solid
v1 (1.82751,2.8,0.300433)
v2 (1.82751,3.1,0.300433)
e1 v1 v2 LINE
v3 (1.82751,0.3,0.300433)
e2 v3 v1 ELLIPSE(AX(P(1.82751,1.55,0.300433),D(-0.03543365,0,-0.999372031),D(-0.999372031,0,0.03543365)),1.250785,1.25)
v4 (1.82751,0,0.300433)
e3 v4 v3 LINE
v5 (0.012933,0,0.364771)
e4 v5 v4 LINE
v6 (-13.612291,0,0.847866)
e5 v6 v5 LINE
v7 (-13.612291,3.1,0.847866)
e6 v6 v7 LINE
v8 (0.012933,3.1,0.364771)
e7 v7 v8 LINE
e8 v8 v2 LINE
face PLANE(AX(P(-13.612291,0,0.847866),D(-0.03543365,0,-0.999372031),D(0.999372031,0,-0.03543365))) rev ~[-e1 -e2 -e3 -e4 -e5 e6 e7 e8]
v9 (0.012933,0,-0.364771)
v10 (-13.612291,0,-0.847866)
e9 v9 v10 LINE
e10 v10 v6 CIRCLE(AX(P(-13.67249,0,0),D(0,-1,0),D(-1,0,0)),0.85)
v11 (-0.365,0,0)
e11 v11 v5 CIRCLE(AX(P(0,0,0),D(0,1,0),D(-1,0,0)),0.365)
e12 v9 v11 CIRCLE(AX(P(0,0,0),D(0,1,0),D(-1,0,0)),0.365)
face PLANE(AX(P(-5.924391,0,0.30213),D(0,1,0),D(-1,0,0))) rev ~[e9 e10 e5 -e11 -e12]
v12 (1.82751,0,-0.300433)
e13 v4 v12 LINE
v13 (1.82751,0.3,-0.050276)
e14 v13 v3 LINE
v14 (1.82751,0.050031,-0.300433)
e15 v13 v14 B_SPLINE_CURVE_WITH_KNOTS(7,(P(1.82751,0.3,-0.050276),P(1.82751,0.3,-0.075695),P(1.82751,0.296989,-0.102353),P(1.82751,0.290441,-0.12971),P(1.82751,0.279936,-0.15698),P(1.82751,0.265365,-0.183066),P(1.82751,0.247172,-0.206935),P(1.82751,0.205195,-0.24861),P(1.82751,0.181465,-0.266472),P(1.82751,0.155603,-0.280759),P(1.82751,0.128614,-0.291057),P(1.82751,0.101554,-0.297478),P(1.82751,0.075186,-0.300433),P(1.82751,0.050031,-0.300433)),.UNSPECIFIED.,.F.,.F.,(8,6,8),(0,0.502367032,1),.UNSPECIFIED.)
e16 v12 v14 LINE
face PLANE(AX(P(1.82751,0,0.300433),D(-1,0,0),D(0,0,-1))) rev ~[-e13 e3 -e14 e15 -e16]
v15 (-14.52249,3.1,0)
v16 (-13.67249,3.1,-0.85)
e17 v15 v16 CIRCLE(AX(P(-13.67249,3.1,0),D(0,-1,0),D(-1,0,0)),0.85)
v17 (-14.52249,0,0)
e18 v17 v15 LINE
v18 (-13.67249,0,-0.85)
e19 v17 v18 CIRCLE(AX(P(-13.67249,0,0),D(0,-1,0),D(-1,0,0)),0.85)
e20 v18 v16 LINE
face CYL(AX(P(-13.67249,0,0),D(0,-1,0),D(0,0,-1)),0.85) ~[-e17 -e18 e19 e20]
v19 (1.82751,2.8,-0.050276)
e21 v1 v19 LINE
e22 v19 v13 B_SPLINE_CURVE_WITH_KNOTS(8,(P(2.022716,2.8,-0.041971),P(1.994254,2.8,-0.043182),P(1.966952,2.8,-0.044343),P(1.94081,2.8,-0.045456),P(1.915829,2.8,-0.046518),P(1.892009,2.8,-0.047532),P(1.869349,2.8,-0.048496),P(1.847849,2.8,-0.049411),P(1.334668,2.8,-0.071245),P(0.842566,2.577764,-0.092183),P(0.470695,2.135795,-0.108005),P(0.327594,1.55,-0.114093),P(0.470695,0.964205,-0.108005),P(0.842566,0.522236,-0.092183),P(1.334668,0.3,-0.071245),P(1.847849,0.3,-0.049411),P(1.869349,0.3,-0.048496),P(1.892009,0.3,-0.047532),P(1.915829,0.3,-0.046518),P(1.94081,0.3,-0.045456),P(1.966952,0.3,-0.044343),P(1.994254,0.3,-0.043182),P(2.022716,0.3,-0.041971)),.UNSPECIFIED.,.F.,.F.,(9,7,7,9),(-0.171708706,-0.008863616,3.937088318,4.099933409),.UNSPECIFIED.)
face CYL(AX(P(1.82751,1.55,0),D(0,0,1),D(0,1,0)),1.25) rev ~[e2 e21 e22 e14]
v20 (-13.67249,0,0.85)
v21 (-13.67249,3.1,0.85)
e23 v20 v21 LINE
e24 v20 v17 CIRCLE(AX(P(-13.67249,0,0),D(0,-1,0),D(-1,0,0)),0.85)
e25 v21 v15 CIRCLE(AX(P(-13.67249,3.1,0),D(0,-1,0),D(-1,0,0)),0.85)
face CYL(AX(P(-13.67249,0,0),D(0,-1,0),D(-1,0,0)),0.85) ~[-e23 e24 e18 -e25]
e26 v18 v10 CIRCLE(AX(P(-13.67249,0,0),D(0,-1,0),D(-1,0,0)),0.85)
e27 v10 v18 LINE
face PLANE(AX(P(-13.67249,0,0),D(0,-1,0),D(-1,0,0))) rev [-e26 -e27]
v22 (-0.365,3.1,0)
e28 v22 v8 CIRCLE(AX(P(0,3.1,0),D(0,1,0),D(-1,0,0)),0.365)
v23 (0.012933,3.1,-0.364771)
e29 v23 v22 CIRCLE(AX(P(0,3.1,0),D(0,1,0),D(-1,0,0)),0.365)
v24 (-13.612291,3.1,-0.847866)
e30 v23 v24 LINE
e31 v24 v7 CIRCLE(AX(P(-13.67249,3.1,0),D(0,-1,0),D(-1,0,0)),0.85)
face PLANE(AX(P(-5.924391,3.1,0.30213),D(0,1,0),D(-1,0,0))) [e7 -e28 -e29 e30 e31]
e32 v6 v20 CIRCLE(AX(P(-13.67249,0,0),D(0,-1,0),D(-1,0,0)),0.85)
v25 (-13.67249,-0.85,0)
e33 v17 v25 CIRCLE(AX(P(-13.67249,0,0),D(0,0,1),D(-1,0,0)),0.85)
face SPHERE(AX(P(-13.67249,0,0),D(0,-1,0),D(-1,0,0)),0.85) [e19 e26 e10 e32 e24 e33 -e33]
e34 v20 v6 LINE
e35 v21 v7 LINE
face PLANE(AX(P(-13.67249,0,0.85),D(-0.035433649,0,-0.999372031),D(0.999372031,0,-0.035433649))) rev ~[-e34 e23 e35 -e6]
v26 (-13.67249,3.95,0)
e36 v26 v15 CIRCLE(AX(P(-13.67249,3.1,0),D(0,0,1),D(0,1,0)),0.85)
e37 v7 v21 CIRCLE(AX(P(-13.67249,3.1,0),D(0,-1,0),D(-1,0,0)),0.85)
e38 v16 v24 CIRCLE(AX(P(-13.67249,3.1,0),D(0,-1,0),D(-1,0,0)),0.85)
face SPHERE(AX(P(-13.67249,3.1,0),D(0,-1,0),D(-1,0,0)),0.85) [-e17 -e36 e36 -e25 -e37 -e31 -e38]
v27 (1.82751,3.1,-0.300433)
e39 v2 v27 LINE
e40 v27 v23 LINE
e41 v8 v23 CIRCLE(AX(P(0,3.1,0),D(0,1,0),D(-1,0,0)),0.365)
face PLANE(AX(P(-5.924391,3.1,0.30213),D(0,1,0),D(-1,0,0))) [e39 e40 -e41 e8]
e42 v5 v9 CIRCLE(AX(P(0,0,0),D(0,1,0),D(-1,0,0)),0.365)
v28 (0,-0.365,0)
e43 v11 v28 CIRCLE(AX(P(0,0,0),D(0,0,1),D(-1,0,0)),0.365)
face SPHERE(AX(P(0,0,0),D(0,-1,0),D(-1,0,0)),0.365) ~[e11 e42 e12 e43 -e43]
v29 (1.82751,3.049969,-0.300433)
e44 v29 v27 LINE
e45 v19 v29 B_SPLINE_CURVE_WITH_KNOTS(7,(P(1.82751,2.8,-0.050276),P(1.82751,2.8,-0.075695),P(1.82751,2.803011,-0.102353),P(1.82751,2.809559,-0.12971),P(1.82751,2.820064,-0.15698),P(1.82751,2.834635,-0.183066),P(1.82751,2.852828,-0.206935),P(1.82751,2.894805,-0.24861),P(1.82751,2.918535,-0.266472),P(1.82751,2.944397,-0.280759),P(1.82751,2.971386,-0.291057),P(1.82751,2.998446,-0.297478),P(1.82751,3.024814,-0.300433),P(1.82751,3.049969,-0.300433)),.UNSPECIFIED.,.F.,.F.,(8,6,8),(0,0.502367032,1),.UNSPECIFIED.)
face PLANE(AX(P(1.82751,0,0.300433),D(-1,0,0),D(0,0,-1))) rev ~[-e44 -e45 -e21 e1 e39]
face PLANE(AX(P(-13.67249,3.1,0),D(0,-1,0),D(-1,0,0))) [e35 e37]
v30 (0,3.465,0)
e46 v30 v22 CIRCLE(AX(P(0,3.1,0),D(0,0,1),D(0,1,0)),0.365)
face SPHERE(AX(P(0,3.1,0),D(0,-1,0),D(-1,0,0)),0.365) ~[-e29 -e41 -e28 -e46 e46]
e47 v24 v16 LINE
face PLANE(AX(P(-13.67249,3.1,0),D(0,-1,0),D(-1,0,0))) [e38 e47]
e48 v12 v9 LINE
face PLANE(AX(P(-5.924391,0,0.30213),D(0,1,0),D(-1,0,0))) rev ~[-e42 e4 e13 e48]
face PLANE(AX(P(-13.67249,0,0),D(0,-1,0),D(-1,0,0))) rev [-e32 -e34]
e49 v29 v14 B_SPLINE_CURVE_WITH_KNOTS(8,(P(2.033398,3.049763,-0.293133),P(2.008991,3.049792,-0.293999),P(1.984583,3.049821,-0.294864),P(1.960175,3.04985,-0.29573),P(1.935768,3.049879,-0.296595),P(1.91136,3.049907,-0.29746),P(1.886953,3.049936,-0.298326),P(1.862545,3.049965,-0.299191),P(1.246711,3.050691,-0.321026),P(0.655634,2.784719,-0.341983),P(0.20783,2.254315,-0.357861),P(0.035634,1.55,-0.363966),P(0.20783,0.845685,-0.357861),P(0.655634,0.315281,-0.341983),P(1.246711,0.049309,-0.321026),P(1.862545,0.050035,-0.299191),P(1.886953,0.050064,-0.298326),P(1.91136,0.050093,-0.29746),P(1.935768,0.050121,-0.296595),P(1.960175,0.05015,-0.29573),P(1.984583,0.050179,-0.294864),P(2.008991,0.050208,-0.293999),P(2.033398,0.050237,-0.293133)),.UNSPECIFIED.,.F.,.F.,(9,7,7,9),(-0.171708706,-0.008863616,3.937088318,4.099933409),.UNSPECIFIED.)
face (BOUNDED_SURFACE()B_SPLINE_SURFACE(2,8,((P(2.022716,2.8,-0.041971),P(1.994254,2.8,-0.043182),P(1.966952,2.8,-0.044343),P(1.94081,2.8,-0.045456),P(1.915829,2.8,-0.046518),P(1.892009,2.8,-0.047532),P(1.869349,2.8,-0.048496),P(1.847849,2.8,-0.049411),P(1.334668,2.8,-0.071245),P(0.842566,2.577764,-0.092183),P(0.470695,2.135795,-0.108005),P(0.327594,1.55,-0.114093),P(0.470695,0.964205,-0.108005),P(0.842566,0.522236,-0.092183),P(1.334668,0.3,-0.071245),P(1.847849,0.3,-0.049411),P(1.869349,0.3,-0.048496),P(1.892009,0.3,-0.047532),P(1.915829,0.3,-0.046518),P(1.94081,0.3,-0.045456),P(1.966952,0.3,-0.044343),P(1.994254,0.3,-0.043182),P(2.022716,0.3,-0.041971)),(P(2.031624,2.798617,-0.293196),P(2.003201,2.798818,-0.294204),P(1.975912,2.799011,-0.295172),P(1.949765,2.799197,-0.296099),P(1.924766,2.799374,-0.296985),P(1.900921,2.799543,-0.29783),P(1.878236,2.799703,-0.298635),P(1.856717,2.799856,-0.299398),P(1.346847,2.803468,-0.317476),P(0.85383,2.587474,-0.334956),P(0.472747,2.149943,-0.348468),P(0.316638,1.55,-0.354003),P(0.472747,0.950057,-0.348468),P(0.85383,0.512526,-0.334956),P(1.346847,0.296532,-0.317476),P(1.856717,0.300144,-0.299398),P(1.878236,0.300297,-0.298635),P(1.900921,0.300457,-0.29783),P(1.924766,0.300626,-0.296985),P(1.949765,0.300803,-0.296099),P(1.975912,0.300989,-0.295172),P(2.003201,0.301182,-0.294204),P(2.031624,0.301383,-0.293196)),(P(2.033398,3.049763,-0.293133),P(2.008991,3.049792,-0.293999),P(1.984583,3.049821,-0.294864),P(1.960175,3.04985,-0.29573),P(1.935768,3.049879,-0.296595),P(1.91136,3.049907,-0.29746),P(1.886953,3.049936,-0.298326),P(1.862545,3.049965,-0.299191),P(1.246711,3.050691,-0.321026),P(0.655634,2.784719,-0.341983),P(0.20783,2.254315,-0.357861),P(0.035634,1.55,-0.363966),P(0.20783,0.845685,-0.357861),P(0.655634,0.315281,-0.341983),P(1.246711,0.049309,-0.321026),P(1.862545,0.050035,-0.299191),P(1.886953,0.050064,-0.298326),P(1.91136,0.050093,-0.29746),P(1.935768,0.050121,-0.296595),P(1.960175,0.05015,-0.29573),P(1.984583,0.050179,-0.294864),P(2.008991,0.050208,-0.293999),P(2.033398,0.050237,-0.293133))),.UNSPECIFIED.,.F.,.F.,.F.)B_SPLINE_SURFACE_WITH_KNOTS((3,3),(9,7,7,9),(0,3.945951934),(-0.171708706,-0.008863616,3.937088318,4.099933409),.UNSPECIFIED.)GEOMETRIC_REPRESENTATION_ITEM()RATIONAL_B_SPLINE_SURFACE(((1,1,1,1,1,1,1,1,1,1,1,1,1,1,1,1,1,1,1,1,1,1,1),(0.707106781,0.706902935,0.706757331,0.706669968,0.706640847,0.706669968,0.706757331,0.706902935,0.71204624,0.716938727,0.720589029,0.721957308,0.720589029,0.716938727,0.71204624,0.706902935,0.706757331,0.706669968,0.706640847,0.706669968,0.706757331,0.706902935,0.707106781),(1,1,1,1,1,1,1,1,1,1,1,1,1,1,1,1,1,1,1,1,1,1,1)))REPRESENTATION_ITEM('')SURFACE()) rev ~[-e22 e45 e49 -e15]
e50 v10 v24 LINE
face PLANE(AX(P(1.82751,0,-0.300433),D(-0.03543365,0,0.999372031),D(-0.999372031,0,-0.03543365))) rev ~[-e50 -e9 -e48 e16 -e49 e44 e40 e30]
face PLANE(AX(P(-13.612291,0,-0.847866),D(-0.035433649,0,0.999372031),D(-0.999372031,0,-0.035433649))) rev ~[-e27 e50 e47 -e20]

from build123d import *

# Parameters (mm, degrees)
F4_DEPTH = 3.1
F5_DEPTH = 0.5
F6_R     = 0.25


# Not quite as in the source:
# - a feature names something its author has since deleted; it is built from what else it names


with BuildPart() as f1:
    # F0 (on Top) → F1 (revolve)
    with BuildSketch(Plane.XY):
        with BuildLine():
            Line((-14.52249, 3.1), (-13.67249, 3.1))
            Line((-13.67249, 3.1), (-13.67249, 3.95))
            ThreePointArc((-13.67249, 3.95), (-14.273530764, 3.701040764), (-14.52249, 3.1))
        make_face()
    revolve(axis=Axis((-13.67249, 1.55, 0), (0, -1, 0)))



with BuildPart() as f1b:
    # F0 (on Top) → F1, piece 2 (revolve)
    with BuildSketch(Plane.XY):
        with BuildLine():
            Line((-13.67249, -0.85), (-13.67249, 0))
            Line((-13.67249, 0), (-14.52249, 0))
            ThreePointArc((-14.52249, 0), (-14.273530764, -0.601040764), (-13.67249, -0.85))
        make_face()
    revolve(axis=Axis((-13.67249, 1.55, 0), (0, -1, 0)))


with BuildPart() as f2:
    # F0 (on Top) → F2 (revolve)
    with BuildSketch(Plane.XY):
        with BuildLine():
            Line((-0.365, 3.1), (0, 3.1))
            Line((0, 3.1), (0, 3.465))
            ThreePointArc((0, 3.465), (-0.2580939751, 3.3580939751), (-0.365, 3.1))
        make_face()
    revolve(axis=Axis((0, 1.55, 0), (0, 1, 0)))


with BuildPart() as f2b:
    # F0 (on Top) → F2, piece 2 (revolve)
    with BuildSketch(Plane.XY):
        with BuildLine():
            Line((0, -0.365), (0, 0))
            Line((0, 0), (-0.365, 0))
            ThreePointArc((-0.365, 0), (-0.2580939751, -0.2580939751), (0, -0.365))
        make_face()
    revolve(axis=Axis((0, 1.55, 0), (0, 1, 0)))


with BuildPart() as f1_1:
    add(f1.part)

    add(f1b.part)  # F4 merges F1b

    add(f2.part)  # F4 merges F2

    add(f2b.part)  # F4 merges F2b
    # F3 (on face) → F4 (join, through all)
    with BuildSketch(Plane(origin=(0, 0, 0), x_dir=(-1, 0, 0), z_dir=(0, 1, 0))):
        with BuildLine():
            Line((-1.82751, 0), (12.82249, 0))
            ThreePointArc((12.82249, 0), (13.0505296028, 0.579366261), (13.612290622, 0.847865576))
            Line((13.612290622, 0.847865576), (-1.82751, 0.3004333129))
            Line((-1.82751, 0.3004333129), (-1.82751, 0))
        make_face()
        with BuildLine():
            Line((-1.82751, -0.3004333129), (13.612290622, -0.847865576))
            ThreePointArc((13.612290622, -0.847865576), (13.0505296028, -0.579366261), (12.82249, 0))
            Line((12.82249, 0), (-1.82751, 0))
            Line((-1.82751, 0), (-1.82751, -0.3004333129))
        make_face()
        with BuildLine():
            Line((12.82249, 0), (14.52249, 0))
            ThreePointArc((14.52249, 0), (14.273530764, 0.601040764), (13.67249, 0.85))
            Line((13.67249, 0.85), (13.612290622, 0.847865576))
            ThreePointArc((13.612290622, 0.847865576), (13.0505296028, 0.579366261), (12.82249, 0))
        make_face()
        with BuildLine():
            Line((13.612290622, -0.847865576), (13.67249, -0.85))
            ThreePointArc((13.67249, -0.85), (14.273530764, -0.601040764), (14.52249, 0))
            Line((14.52249, 0), (12.82249, 0))
            ThreePointArc((12.82249, 0), (13.0505296028, -0.579366261), (13.612290622, -0.847865576))
        make_face()
    extrude(amount=F4_DEPTH)

    # F0 (on Top) → F5 (cut, symmetric)
    with BuildSketch(Plane.XY):
        with BuildLine():
            ThreePointArc((1.82751, 2.8), (0.57751, 1.55), (1.82751, 0.3))
            Line((1.82751, 0.3), (1.82751, 2.8))
        make_face()
    extrude(amount=F5_DEPTH, both=True, mode=Mode.SUBTRACT)

    # F6
    f6_edges = [f1_1.edges().sort_by_distance(p)[0] for p in [
        (0.57751, 1.55, -0.344753),
    ]]
    fillet(f6_edges, radius=F6_R)


solid = f1_1.part
